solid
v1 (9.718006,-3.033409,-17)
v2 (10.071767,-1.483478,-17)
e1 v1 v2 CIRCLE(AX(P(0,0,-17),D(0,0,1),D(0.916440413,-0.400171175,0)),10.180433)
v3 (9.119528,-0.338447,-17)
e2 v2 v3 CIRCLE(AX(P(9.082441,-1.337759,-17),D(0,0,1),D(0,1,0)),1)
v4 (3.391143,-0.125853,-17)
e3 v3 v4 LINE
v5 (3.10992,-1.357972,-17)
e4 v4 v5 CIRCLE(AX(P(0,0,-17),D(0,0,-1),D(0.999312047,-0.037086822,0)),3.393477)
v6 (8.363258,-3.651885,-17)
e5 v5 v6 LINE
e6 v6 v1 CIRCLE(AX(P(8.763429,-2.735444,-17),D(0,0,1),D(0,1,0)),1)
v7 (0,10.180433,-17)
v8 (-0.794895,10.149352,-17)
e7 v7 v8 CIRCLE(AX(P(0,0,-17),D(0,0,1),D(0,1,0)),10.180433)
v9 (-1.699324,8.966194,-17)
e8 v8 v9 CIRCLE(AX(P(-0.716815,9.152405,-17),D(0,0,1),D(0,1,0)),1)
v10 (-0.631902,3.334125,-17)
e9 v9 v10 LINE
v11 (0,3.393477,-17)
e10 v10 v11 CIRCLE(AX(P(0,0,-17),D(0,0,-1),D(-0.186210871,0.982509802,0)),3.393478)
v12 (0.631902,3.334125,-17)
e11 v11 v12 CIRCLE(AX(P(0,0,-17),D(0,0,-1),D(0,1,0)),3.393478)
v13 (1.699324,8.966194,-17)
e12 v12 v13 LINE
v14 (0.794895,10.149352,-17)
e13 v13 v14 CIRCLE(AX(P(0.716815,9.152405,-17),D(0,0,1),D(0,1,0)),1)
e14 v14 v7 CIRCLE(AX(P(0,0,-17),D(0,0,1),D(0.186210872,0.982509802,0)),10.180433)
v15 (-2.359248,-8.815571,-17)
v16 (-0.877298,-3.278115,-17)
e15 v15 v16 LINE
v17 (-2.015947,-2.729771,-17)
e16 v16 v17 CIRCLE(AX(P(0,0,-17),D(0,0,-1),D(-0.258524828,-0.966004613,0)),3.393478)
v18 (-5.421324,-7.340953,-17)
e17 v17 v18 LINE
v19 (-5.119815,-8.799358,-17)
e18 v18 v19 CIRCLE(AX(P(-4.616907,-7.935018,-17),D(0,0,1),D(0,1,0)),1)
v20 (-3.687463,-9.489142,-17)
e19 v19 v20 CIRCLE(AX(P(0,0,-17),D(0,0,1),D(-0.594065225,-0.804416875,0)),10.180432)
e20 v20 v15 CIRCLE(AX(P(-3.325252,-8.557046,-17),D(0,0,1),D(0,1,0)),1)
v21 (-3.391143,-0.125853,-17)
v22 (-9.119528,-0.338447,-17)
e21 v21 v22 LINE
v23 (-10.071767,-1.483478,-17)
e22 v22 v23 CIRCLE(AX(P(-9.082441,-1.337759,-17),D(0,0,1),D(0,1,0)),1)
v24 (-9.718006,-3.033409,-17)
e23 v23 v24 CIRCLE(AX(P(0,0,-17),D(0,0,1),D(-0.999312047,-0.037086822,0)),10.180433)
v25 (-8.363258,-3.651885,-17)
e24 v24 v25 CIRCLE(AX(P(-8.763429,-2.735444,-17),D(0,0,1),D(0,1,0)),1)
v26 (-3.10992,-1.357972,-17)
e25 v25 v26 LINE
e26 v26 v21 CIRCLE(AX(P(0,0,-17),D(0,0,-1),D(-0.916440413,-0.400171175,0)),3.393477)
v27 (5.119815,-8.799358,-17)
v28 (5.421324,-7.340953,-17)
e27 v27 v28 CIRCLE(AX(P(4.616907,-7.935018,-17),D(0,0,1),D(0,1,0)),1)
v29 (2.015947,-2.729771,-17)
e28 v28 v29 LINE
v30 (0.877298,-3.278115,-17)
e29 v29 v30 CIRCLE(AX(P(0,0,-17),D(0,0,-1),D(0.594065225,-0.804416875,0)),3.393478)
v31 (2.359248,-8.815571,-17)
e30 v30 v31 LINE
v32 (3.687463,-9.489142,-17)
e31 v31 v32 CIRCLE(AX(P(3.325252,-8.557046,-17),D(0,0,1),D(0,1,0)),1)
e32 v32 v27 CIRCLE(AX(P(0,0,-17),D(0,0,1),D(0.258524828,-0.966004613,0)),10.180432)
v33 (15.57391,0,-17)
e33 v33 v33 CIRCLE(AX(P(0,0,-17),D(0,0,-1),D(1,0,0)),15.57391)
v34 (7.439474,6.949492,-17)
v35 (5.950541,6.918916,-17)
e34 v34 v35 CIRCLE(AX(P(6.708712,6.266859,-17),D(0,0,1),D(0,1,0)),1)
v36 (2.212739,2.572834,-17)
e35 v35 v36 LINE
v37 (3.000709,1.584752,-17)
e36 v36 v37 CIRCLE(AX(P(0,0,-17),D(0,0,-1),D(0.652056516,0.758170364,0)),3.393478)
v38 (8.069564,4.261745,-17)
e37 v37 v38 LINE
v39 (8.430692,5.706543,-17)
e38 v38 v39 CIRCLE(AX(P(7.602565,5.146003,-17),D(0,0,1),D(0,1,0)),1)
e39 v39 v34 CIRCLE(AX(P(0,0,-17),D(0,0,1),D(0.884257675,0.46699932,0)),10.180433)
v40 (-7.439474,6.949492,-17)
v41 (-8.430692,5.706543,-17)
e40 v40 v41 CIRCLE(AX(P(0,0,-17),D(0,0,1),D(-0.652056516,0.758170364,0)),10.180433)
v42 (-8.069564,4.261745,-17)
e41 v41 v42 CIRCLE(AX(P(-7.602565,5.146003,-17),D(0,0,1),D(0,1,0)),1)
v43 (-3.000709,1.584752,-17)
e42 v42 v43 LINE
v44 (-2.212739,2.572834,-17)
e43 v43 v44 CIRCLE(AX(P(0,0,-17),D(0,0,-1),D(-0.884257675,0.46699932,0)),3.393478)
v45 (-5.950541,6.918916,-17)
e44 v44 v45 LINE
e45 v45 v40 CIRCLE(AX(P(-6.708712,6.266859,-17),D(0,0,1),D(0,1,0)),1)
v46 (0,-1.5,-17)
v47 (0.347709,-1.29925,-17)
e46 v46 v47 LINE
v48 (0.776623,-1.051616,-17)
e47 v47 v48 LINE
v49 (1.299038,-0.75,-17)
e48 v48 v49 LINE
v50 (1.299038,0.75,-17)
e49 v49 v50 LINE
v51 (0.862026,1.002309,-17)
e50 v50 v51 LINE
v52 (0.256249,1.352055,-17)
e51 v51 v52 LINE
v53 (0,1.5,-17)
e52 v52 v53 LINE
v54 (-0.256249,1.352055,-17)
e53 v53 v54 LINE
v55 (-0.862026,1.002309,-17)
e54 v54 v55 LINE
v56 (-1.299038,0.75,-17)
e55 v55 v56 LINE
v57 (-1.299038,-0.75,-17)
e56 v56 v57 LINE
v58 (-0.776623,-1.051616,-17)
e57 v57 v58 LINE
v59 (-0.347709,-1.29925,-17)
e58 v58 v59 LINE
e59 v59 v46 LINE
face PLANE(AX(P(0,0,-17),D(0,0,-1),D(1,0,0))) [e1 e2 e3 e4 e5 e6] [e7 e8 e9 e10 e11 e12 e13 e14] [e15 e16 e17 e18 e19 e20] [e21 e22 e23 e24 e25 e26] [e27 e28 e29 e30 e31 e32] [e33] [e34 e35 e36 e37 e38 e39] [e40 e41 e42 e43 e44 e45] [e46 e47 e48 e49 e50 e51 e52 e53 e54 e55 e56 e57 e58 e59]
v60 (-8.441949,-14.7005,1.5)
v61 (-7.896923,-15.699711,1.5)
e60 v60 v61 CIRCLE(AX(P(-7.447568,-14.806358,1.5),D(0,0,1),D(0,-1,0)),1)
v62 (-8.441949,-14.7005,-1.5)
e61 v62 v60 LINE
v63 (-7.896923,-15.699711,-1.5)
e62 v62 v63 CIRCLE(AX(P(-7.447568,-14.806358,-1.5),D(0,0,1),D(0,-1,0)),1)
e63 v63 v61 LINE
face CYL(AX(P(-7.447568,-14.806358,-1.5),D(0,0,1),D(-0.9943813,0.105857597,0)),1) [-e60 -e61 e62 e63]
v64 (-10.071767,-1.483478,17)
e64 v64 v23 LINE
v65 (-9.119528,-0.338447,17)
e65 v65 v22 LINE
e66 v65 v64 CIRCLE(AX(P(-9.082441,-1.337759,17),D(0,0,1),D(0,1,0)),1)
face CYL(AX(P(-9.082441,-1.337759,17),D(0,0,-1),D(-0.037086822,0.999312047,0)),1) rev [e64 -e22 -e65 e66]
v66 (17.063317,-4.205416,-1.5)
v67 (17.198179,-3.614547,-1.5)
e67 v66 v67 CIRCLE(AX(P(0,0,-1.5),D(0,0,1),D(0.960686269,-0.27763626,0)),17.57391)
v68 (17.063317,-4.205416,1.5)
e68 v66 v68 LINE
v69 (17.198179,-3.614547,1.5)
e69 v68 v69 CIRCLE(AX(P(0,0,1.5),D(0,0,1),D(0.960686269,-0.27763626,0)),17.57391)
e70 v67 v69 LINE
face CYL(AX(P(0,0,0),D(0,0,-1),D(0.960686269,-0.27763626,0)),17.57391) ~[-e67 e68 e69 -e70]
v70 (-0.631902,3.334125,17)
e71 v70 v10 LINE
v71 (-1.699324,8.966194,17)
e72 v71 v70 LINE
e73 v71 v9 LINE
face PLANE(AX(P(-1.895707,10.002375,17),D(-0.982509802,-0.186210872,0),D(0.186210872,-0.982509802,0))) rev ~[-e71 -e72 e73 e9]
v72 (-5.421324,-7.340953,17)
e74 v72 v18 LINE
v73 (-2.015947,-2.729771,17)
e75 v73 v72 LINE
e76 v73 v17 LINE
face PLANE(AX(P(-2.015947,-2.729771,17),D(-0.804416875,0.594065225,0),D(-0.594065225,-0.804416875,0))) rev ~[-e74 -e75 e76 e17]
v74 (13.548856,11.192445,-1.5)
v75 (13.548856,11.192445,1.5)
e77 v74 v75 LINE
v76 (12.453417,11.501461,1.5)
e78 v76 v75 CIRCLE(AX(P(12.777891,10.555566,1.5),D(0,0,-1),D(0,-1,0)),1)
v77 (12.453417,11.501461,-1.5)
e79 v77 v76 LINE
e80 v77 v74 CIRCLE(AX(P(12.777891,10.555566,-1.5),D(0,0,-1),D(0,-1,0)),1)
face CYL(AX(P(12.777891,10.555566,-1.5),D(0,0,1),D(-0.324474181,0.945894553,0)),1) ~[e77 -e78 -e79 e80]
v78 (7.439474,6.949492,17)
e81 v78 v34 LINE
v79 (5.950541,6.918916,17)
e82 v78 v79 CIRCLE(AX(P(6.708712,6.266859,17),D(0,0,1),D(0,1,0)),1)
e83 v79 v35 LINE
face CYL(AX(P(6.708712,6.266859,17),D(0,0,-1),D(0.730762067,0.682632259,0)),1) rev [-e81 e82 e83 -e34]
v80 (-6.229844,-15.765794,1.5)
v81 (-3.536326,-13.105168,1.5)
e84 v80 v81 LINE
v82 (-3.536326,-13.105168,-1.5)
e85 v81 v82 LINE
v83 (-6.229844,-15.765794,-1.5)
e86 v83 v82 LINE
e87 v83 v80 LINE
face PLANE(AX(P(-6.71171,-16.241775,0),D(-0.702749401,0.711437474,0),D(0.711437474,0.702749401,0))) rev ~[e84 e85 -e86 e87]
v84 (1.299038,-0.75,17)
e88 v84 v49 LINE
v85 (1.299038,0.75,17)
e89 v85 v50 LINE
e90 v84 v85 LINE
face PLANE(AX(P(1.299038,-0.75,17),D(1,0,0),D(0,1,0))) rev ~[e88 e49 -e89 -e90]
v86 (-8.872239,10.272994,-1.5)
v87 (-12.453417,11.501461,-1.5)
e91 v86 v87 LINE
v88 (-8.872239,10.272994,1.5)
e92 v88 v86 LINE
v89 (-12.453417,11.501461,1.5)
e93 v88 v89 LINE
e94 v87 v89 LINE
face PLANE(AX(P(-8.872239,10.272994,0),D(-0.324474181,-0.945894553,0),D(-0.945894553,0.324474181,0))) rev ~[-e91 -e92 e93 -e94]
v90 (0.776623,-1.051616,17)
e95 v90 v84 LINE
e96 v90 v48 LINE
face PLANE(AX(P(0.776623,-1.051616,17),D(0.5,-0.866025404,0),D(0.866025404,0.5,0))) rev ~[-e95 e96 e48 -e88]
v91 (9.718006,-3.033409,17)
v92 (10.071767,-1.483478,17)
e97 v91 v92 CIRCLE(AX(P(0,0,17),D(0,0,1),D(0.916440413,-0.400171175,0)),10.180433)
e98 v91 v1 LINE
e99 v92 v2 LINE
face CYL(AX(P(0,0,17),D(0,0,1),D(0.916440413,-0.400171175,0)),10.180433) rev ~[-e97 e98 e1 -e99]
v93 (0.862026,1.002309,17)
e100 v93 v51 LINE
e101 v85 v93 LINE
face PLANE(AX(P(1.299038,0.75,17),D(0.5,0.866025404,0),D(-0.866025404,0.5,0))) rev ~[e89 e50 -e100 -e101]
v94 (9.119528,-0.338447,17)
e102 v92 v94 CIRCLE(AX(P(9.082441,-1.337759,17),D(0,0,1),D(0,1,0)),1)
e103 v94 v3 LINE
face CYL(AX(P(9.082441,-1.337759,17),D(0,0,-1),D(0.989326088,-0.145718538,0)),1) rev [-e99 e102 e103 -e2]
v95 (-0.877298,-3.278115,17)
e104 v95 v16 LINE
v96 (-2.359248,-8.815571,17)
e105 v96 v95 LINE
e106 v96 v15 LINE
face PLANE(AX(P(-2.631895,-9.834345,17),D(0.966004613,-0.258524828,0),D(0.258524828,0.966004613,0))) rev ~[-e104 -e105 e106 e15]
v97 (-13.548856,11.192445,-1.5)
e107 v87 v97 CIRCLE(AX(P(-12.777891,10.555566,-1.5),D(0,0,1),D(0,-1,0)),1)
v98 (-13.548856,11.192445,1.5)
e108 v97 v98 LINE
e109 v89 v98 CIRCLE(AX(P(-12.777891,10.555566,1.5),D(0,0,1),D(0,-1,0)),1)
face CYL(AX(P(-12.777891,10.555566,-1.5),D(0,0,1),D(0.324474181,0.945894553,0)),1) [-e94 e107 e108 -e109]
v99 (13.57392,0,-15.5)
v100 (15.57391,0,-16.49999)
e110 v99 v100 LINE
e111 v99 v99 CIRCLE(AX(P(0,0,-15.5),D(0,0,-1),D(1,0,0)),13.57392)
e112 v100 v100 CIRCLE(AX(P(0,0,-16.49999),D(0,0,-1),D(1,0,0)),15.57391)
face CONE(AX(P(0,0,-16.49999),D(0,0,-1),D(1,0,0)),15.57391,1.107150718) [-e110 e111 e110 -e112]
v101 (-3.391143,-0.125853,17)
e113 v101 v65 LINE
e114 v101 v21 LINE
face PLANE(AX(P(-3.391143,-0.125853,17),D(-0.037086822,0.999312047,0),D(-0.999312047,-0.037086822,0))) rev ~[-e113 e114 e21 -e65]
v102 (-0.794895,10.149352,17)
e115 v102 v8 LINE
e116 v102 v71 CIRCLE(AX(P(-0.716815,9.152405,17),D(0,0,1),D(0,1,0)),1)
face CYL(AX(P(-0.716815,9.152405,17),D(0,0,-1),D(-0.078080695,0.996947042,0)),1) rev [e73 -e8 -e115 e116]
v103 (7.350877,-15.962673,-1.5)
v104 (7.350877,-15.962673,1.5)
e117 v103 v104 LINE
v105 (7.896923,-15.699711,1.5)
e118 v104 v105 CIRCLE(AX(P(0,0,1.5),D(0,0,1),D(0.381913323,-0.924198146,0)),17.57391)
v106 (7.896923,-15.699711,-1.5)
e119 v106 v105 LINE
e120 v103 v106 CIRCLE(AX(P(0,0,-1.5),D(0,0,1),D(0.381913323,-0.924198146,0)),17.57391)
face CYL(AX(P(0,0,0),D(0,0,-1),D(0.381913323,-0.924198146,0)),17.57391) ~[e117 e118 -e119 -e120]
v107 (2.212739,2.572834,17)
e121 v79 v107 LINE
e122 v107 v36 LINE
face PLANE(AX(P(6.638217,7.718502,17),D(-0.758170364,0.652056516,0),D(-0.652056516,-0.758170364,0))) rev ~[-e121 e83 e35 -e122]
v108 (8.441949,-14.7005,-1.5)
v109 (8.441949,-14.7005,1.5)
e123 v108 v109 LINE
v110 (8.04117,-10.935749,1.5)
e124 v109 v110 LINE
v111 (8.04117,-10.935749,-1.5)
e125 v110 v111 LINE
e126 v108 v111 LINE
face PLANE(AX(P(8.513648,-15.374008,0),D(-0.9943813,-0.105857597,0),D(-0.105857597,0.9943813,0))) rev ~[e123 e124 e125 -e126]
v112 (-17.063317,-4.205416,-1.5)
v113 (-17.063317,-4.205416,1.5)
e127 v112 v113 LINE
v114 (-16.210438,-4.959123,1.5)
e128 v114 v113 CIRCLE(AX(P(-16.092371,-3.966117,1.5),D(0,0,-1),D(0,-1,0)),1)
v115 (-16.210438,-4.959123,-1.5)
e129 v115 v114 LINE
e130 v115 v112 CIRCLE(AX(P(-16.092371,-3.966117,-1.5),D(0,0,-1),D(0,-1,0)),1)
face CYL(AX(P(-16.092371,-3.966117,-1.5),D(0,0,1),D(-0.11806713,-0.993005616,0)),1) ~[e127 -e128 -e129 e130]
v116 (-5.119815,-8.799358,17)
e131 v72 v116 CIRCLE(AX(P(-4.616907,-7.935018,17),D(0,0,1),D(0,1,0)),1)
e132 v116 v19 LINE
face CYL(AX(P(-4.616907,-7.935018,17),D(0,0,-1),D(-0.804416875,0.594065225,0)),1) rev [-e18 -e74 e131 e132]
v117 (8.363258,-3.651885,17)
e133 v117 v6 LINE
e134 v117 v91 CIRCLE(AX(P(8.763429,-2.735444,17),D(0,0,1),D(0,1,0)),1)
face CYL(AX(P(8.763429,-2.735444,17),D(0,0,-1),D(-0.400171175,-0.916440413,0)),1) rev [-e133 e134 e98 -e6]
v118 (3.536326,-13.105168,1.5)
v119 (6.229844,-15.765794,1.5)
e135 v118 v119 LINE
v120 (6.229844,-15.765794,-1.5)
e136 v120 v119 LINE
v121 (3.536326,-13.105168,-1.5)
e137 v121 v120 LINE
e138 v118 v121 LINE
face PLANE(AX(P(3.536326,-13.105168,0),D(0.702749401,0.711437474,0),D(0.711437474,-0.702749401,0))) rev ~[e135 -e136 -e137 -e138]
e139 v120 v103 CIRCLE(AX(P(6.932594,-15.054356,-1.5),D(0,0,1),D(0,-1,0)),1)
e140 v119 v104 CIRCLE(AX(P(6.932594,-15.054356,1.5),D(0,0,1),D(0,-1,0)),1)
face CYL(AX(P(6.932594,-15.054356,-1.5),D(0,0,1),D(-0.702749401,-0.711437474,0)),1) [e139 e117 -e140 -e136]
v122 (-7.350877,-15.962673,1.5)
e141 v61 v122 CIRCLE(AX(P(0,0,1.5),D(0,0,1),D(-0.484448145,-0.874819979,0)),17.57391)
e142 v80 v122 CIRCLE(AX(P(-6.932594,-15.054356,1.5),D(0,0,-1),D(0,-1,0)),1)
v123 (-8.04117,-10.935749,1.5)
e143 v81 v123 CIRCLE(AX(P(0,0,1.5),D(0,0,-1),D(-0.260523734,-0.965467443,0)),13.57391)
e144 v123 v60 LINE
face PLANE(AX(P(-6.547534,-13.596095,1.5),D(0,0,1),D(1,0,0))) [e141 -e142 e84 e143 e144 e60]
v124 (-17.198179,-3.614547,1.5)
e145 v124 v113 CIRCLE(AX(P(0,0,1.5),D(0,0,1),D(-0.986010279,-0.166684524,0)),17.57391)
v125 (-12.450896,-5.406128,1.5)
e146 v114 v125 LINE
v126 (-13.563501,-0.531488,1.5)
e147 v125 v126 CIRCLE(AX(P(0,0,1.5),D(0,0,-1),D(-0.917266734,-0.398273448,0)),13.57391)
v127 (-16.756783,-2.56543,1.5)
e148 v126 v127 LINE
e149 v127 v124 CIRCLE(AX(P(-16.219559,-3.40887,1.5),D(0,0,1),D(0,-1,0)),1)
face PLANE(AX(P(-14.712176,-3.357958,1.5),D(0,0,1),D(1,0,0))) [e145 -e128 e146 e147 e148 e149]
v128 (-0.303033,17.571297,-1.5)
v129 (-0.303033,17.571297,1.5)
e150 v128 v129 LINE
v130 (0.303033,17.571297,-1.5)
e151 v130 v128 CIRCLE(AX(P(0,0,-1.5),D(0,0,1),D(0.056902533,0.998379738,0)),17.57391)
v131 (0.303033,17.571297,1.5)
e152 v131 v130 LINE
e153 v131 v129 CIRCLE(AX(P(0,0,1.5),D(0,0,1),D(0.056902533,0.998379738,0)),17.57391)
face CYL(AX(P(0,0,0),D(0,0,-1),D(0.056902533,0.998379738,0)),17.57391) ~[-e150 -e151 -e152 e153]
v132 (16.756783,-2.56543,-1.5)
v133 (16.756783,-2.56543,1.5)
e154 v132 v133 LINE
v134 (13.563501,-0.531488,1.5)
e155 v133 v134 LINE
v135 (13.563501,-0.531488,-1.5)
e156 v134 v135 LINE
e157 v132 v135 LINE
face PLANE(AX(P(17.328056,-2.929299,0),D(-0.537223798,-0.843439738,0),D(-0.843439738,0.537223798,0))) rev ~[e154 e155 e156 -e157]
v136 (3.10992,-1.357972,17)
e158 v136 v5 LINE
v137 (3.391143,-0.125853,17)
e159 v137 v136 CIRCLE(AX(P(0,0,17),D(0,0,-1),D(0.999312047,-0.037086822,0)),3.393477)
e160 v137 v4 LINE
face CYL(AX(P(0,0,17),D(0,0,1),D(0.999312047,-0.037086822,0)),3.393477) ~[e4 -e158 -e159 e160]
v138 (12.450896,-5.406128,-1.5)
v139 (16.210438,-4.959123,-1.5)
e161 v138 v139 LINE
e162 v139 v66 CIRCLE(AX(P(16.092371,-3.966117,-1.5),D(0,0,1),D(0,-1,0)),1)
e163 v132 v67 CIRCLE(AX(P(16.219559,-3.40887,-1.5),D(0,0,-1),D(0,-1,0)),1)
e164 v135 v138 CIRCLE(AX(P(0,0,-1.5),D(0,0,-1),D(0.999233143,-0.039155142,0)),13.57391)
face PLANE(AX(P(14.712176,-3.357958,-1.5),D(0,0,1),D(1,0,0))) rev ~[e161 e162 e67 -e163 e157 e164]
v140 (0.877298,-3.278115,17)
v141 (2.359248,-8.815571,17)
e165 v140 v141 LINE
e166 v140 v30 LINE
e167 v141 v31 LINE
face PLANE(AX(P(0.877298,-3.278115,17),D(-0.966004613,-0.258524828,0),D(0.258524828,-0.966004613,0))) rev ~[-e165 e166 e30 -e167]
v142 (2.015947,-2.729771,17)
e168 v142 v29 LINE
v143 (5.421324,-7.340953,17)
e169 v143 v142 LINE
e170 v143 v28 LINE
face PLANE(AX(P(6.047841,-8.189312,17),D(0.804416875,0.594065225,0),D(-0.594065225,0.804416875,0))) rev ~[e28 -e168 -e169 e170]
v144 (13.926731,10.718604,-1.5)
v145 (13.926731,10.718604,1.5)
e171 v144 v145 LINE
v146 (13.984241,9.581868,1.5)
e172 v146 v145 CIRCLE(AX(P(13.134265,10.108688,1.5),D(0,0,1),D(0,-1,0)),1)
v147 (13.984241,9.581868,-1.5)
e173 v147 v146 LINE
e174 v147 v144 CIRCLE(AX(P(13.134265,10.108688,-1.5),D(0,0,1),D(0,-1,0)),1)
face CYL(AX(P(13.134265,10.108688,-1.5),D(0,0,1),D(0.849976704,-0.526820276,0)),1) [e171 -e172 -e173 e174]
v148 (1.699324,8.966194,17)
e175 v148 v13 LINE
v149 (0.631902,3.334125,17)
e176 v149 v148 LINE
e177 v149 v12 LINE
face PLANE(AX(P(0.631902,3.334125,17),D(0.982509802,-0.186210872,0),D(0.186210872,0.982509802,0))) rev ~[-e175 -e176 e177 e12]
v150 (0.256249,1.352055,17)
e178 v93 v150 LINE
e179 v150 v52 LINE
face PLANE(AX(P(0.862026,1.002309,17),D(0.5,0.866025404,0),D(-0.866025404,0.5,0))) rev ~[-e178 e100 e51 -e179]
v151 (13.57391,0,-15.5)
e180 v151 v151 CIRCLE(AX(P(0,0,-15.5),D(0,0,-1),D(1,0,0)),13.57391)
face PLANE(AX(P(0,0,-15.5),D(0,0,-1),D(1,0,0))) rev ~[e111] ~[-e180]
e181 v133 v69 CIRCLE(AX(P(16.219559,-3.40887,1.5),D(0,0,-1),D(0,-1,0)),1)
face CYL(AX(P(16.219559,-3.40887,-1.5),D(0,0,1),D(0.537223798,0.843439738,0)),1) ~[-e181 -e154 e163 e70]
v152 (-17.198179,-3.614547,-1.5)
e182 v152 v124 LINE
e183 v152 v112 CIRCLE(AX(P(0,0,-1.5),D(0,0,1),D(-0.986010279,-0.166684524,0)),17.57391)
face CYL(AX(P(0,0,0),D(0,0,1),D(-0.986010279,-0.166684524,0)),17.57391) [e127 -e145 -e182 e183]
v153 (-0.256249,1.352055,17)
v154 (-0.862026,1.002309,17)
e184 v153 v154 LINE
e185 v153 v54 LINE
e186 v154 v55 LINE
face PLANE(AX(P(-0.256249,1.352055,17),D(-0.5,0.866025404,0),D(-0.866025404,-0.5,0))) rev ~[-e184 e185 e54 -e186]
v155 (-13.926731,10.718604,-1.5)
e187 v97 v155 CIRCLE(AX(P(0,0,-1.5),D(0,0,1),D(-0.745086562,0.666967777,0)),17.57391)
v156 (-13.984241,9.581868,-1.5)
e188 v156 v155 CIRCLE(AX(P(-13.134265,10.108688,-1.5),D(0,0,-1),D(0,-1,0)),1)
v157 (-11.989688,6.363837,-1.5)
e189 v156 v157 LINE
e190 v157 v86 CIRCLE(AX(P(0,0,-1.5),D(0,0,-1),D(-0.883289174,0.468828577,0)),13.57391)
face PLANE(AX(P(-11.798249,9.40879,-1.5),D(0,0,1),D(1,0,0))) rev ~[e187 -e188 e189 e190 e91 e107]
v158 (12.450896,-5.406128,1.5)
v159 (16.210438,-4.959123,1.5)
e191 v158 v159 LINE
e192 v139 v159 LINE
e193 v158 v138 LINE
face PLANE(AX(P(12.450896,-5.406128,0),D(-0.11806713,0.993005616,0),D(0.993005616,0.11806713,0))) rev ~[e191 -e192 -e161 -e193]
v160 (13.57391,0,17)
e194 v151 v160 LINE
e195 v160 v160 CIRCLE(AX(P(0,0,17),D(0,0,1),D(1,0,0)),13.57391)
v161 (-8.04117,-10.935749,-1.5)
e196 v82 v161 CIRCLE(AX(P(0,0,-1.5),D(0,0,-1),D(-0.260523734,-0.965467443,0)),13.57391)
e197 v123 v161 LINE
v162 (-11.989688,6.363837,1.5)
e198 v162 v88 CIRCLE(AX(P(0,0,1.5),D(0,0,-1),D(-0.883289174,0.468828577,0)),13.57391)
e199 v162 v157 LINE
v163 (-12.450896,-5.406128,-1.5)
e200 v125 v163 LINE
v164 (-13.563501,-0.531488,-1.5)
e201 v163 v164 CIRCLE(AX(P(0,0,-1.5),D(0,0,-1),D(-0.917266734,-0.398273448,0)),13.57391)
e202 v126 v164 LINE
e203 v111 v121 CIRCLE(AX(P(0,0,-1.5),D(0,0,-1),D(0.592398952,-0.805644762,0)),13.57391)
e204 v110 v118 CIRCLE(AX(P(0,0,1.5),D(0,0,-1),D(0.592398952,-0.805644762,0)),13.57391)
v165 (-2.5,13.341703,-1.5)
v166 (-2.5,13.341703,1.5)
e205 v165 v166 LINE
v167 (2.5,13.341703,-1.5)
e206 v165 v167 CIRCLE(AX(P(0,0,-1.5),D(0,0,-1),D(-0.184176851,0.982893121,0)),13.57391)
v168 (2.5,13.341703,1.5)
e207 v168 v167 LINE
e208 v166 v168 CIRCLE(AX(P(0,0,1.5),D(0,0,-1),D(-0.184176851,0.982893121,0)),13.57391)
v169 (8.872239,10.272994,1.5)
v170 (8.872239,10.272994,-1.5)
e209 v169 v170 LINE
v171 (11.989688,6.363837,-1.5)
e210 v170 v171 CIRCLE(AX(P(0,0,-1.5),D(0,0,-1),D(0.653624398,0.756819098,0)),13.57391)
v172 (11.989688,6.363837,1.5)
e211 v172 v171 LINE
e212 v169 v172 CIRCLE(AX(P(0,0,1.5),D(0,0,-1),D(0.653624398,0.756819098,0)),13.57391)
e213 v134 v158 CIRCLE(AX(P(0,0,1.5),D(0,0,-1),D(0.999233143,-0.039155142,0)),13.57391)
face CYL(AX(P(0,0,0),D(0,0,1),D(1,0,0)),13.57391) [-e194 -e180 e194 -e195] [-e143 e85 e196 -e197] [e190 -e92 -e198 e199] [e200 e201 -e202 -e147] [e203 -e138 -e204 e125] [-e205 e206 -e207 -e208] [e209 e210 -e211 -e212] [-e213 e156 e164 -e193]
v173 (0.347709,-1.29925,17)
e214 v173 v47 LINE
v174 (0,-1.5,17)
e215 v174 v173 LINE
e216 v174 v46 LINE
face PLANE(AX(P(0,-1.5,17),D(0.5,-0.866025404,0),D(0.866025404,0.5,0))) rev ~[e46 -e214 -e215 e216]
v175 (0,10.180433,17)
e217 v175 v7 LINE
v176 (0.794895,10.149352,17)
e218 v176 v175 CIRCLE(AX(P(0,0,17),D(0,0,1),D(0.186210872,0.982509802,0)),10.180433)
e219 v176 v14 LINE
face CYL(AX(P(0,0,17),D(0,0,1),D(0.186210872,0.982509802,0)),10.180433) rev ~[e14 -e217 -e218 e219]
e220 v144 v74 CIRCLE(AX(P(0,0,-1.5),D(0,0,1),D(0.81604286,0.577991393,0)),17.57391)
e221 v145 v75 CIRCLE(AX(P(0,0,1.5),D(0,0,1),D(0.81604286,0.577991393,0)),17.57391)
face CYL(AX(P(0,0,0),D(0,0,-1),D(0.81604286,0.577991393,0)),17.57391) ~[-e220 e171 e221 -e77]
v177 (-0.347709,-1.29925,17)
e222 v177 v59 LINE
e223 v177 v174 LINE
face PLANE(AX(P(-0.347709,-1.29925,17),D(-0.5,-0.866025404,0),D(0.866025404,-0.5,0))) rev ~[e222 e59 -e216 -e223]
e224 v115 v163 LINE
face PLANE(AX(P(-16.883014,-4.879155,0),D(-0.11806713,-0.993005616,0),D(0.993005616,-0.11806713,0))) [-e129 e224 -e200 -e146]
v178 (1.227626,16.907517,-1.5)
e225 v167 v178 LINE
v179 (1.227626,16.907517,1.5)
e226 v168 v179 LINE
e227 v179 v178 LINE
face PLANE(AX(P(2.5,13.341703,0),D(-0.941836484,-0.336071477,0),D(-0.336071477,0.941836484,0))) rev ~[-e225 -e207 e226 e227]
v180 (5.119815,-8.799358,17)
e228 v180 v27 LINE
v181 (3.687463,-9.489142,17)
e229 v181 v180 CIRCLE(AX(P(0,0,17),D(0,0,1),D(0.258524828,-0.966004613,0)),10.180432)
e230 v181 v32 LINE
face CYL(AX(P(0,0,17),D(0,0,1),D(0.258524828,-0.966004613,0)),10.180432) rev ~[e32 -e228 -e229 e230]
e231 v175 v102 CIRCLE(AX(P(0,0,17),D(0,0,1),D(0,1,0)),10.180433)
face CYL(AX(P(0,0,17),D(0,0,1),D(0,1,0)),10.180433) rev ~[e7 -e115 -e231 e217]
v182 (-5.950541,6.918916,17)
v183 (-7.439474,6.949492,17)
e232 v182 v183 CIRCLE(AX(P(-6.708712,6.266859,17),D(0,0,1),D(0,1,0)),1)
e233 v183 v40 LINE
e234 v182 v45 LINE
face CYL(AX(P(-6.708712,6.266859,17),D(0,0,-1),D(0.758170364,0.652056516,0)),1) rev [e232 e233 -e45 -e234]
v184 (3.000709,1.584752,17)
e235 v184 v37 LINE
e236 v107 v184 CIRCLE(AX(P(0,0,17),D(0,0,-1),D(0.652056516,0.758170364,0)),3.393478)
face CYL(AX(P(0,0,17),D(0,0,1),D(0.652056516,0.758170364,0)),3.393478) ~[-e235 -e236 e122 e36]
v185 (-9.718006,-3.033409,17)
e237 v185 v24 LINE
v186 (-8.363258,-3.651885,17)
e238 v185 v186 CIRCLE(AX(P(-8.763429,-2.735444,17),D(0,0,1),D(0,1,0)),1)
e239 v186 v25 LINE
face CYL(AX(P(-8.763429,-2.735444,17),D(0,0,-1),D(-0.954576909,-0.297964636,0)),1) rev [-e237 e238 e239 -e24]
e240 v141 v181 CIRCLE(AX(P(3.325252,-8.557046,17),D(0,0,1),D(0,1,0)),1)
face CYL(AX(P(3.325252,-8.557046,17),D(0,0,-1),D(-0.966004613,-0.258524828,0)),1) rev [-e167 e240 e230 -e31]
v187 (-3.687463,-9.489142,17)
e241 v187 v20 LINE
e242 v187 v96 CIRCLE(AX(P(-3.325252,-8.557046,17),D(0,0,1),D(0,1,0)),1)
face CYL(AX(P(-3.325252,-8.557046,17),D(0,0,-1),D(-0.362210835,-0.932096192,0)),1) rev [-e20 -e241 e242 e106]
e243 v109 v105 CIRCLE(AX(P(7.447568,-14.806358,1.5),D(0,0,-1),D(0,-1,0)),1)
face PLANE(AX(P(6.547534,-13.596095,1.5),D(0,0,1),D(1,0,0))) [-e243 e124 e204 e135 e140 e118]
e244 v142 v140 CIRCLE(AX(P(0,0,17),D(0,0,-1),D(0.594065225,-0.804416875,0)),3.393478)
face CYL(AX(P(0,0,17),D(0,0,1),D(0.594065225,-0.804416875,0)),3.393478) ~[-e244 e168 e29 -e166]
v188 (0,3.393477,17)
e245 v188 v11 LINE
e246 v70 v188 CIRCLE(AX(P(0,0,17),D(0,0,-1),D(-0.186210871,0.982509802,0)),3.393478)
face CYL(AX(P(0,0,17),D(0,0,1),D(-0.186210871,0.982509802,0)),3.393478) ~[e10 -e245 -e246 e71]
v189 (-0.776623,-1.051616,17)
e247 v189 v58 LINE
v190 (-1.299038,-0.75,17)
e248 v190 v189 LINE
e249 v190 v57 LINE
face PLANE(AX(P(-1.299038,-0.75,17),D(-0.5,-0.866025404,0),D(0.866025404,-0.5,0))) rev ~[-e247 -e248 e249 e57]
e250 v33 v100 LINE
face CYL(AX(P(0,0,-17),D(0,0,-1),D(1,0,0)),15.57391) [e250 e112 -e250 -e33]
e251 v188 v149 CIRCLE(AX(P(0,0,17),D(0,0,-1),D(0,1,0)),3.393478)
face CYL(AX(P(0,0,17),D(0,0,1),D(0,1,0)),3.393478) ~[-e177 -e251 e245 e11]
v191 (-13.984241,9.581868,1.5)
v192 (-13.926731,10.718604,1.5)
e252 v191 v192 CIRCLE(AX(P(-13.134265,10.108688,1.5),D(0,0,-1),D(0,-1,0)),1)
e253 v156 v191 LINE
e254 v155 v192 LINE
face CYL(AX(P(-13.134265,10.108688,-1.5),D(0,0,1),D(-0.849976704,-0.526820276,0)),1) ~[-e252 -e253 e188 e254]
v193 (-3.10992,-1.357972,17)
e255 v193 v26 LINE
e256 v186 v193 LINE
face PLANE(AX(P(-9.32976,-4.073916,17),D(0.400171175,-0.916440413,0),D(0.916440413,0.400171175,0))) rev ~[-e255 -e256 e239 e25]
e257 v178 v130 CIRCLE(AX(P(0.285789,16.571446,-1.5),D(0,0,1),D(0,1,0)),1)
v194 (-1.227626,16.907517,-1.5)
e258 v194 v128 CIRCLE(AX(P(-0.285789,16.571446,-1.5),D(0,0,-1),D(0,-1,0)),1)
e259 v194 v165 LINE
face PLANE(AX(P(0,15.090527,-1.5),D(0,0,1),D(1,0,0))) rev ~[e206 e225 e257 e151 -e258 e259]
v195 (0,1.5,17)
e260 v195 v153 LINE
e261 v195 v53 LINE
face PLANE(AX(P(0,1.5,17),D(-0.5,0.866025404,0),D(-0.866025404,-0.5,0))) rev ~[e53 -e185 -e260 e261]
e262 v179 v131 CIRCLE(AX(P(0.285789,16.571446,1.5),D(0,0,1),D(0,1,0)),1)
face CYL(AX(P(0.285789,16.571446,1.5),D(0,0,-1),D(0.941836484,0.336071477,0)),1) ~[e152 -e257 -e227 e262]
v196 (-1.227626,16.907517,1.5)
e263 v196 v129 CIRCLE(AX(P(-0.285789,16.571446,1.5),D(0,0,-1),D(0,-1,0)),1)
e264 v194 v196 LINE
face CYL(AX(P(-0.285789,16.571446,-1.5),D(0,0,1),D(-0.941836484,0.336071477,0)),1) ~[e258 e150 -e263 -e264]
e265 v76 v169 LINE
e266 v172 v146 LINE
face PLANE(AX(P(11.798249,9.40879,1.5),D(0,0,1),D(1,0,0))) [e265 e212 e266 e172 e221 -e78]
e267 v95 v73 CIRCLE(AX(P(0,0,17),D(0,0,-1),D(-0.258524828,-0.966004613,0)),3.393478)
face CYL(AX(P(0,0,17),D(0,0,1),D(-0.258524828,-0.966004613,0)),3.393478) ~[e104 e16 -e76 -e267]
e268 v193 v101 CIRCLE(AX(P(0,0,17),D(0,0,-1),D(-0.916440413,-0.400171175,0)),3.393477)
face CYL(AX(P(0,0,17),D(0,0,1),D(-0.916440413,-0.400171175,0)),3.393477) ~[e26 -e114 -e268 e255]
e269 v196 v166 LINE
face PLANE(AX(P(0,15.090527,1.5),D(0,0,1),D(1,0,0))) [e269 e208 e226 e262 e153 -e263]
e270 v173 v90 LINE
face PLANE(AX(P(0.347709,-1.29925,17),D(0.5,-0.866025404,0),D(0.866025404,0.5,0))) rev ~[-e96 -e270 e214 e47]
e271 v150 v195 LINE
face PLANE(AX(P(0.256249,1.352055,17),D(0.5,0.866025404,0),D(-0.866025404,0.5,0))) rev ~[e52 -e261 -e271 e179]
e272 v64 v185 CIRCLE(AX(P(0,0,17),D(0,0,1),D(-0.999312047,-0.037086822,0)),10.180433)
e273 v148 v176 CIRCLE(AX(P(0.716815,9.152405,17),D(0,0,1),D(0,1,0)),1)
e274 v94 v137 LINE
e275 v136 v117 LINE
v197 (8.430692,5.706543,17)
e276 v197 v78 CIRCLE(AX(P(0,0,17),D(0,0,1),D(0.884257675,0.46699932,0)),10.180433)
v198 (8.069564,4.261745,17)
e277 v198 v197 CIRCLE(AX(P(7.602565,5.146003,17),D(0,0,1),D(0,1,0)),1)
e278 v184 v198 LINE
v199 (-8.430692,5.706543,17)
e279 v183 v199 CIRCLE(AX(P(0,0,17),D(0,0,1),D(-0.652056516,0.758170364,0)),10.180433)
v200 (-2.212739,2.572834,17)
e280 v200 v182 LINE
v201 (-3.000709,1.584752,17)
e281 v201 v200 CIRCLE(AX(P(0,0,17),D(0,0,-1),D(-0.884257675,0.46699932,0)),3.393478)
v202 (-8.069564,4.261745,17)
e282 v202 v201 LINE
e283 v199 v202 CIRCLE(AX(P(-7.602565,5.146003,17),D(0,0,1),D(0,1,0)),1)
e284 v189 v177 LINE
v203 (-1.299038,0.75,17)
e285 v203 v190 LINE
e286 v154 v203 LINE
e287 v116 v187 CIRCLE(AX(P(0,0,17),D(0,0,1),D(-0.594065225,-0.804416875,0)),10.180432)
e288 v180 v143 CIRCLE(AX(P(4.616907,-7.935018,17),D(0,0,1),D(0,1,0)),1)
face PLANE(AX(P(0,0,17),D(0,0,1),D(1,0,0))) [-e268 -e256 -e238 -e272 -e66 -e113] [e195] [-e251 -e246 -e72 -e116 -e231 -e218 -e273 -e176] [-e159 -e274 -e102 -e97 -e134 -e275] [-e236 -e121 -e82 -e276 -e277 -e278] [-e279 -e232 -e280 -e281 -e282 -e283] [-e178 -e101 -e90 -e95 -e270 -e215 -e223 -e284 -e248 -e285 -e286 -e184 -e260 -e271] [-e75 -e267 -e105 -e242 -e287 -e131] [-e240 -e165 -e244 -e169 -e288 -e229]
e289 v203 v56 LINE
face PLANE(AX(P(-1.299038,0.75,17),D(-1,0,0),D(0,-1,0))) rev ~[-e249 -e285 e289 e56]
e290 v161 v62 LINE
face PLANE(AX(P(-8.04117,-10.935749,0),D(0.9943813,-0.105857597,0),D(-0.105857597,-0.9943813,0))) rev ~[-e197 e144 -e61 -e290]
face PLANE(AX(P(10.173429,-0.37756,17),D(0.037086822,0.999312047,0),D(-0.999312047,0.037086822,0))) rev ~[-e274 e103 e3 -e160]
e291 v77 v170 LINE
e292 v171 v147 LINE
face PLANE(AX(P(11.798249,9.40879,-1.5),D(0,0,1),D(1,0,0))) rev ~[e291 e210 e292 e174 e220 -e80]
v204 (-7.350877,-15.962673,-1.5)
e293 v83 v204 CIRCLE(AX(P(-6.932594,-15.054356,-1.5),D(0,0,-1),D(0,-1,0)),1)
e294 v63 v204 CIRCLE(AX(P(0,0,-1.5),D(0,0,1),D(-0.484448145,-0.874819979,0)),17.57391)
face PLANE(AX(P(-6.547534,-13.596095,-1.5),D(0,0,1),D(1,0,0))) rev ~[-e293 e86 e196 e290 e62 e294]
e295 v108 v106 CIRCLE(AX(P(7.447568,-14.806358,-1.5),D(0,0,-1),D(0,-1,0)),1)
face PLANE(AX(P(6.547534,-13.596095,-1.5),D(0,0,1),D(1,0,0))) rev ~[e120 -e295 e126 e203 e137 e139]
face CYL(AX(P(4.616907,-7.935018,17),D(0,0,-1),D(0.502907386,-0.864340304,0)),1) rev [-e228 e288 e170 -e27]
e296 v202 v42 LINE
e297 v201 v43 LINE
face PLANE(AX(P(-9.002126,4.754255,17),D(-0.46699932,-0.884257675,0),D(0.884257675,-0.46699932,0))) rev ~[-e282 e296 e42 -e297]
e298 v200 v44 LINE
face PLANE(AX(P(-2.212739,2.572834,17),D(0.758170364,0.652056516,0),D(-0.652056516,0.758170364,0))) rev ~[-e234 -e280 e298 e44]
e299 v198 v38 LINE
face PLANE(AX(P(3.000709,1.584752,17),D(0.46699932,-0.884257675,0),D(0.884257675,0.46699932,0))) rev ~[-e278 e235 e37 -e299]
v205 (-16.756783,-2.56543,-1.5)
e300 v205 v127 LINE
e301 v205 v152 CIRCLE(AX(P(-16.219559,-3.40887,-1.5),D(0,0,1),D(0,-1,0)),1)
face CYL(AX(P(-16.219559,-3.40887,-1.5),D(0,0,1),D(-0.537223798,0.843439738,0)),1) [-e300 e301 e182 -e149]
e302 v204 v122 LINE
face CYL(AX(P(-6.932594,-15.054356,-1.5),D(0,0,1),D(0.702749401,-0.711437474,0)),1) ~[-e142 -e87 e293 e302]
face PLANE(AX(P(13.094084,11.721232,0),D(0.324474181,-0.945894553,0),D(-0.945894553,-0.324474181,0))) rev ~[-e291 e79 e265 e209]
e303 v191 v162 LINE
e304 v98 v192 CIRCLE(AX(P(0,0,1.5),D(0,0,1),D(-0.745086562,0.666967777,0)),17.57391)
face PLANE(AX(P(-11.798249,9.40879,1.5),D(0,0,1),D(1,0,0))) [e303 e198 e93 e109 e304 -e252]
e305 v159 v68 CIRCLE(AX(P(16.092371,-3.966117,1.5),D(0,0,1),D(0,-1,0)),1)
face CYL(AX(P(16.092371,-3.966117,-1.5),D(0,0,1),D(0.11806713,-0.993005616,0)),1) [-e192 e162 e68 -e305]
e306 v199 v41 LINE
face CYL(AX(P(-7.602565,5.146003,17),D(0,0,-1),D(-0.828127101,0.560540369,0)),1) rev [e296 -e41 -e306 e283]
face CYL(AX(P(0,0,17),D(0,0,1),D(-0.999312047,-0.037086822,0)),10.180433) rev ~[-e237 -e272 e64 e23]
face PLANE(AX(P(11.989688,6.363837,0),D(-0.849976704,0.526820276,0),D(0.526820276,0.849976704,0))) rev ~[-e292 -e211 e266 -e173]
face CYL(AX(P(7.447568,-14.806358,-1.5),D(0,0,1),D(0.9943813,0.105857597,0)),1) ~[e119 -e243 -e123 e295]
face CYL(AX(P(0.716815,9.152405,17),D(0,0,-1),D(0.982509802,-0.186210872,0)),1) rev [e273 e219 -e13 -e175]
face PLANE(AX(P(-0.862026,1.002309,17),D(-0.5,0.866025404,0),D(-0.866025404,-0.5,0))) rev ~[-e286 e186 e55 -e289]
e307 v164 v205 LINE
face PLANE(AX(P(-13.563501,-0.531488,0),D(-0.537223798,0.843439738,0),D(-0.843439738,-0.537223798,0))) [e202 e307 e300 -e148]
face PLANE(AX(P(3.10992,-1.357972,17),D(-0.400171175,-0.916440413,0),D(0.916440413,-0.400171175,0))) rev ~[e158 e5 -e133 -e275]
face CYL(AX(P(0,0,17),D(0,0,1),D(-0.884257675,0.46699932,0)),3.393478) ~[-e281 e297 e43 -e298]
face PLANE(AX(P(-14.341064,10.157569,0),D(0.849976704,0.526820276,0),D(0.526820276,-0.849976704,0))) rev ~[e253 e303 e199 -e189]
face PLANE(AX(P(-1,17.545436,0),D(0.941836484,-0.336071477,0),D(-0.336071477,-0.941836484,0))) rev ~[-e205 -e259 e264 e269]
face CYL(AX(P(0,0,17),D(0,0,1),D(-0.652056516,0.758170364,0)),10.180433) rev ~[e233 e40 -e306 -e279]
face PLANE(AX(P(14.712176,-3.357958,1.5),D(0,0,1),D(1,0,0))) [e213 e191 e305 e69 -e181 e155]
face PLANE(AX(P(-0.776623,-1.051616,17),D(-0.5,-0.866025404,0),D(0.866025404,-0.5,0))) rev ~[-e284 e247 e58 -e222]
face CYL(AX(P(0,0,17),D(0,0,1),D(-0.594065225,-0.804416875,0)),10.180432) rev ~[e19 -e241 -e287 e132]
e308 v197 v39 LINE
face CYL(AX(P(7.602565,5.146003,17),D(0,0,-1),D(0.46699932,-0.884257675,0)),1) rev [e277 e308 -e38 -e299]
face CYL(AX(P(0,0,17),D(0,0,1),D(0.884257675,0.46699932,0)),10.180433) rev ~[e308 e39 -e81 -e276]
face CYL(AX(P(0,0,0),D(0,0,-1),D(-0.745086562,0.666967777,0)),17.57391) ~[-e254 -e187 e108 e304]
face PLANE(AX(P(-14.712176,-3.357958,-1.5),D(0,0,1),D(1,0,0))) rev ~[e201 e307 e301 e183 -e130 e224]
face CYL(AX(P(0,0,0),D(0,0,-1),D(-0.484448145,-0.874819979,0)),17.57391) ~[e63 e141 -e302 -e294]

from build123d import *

# Parameters (mm, degrees)
F0_R     = 13.57391
F1_DEPTH = 17
F3_DEPTH = 1.5
F5_DEPTH = 34
F6_R     = 1
F7_R     = 15.57391
F7_R_2   = 13.57391
F8_DEPTH = 1.5
F9_SIZE2 = 0.99999
F9_SIZE  = 1.99999
F10_R    = 1


# Not quite as in the source:
# - a fillet or chamfer is up to 0.001 mm smaller than in the source, because OpenCascade refuses the exact size


with BuildPart() as f1:
    # F0 (on Top) → F1 (new body, symmetric)
    with BuildSketch(Plane.XY):
        Circle(F0_R)
    extrude(amount=F1_DEPTH, both=True)

    # F2 (on Top) → F3 (join, symmetric)
    with BuildSketch(Plane.XY):
        with BuildLine():
            Line((-8.8722387473, 10.27299432), (-13.094084175, 11.721231689))
            ThreePointArc((-13.094084175, 11.721231689), (-13.7398361081, 10.9571536638), (-14.3410637787, 10.1575687241))
            Line((-14.3410637787, 10.1575687241), (-11.9896877566, 6.3638369077))
            ThreePointArc((-11.9896877566, 6.3638369077), (-10.6125101782, 8.4631944563), (-8.8722387473, 10.27299432))
        make_face()
        with BuildLine():
            ThreePointArc((1, 17.5454356654), (0, 17.57391), (-1, 17.5454356654))
            Line((-1, 17.5454356654), (-2.5, 13.3417027657))
            ThreePointArc((-2.5, 13.3417027657), (0, 13.57391), (2.5, 13.3417027657))
            Line((2.5, 13.3417027657), (1, 17.5454356654))
        make_face()
        with BuildLine():
            Line((11.9896877566, 6.3638369077), (14.3410637787, 10.1575687241))
            ThreePointArc((14.3410637787, 10.1575687241), (13.7398361081, 10.9571536638), (13.094084175, 11.721231689))
            Line((13.094084175, 11.721231689), (8.8722387473, 10.27299432))
            ThreePointArc((8.8722387473, 10.27299432), (10.6125101782, 8.4631944563), (11.9896877566, 6.3638369077))
        make_face()
        with BuildLine():
            Line((12.4508960874, -5.4061279404), (16.8830140276, -4.8791546431))
            ThreePointArc((16.8830140276, -4.8791546431), (17.1332953852, -3.9105628665), (17.3280558955, -2.9292988187))
            Line((17.3280558955, -2.9292988187), (13.5635007572, -0.5314883795))
            ThreePointArc((13.5635007572, -0.5314883795), (13.2335837364, -3.0204791306), (12.4508960874, -5.4061279404))
        make_face()
        with BuildLine():
            Line((3.5363257124, -13.1051681845), (6.711710363, -16.2417750474))
            ThreePointArc((6.711710363, -16.2417750474), (7.6250337817, -15.8335457973), (8.5136480988, -15.3740075692))
            Line((8.5136480988, -15.3740075692), (8.0411700519, -10.9357494889))
            ThreePointArc((8.0411700519, -10.9357494889), (5.8894988252, -12.2296703257), (3.5363257124, -13.1051681845))
        make_face()
        with BuildLine():
            Line((-8.0411700519, -10.9357494889), (-8.5136480988, -15.3740075692))
            ThreePointArc((-8.5136480988, -15.3740075692), (-7.6250337817, -15.8335457973), (-6.711710363, -16.2417750474))
            Line((-6.711710363, -16.2417750474), (-3.5363257124, -13.1051681845))
            ThreePointArc((-3.5363257124, -13.1051681845), (-5.8894988252, -12.2296703257), (-8.0411700519, -10.9357494889))
        make_face()
        with BuildLine():
            Line((-13.5635007572, -0.5314883795), (-17.3280558955, -2.9292988187))
            ThreePointArc((-17.3280558955, -2.9292988187), (-17.1332953852, -3.9105628665), (-16.8830140276, -4.8791546431))
            Line((-16.8830140276, -4.8791546431), (-12.4508960874, -5.4061279404))
            ThreePointArc((-12.4508960874, -5.4061279404), (-13.2335837364, -3.0204791306), (-13.5635007572, -0.5314883795))
        make_face()
    extrude(amount=F3_DEPTH, both=True)

    # F4 (on face) → F5 (cut)
    with BuildSketch(Plane.XY.offset(17)):
        with BuildLine():
            ThreePointArc((-3.0007085232, 1.5847516846), (-2.6531275445, 2.1157986141), (-2.2127391143, 2.5728340707))
            Line((-2.2127391143, 2.5728340707), (-6.6382173429, 7.718502212))
            ThreePointArc((-6.6382173429, 7.718502212), (-7.9593826336, 6.3473958423), (-9.0021255696, 4.7542550537))
            Line((-9.0021255696, 4.7542550537), (-3.0007085232, 1.5847516846))
        make_face()
        with BuildLine():
            ThreePointArc((-0.6319024037, 3.334124907), (-0.3173418417, 3.3786067688), (0, 3.3934775))
            Line((0, 3.3934775), (0, 6.786955))
            Line((0, 6.786955), (0, 10.1804325))
            ThreePointArc((0, 10.1804325), (-0.9520255252, 10.1358203065), (-1.895707211, 10.0023747209))
            Line((-1.895707211, 10.0023747209), (-0.6319024037, 3.334124907))
        make_face()
        with BuildLine():
            Line((0, 6.786955), (0, 3.3934775))
            ThreePointArc((0, 3.3934775), (0.3173418417, 3.3786067688), (0.6319024037, 3.334124907))
            Line((0.6319024037, 3.334124907), (1.895707211, 10.0023747209))
            ThreePointArc((1.895707211, 10.0023747209), (0.9520255252, 10.1358203065), (0, 10.1804325))
            Line((0, 10.1804325), (0, 6.786955))
        make_face()
        with BuildLine():
            ThreePointArc((2.2127391143, 2.5728340707), (2.6531275445, 2.1157986141), (3.0007085232, 1.5847516846))
            Line((3.0007085232, 1.5847516846), (9.0021255696, 4.7542550537))
            ThreePointArc((9.0021255696, 4.7542550537), (7.9593826336, 6.3473958423), (6.6382173429, 7.718502212))
            Line((6.6382173429, 7.718502212), (2.2127391143, 2.5728340707))
        make_face()
        with BuildLine():
            ThreePointArc((3.3911429475, -0.1258532971), (3.3083959341, -0.7551197827), (3.1099199215, -1.3579718793))
            Line((3.1099199215, -1.3579718793), (9.3297597644, -4.073915638))
            ThreePointArc((9.3297597644, -4.073915638), (9.9251878023, -2.265359348), (10.1734288426, -0.3775598913))
            Line((10.1734288426, -0.3775598913), (3.3911429475, -0.1258532971))
        make_face()
        with BuildLine():
            ThreePointArc((2.0159469746, -2.7297705652), (1.4723747063, -3.0574175814), (0.8772981881, -3.2781149205))
            Line((0.8772981881, -3.2781149205), (2.6318945642, -9.8343447616))
            ThreePointArc((2.6318945642, -9.8343447616), (4.4171241189, -9.1722527443), (6.0478409237, -8.1893116956))
            Line((6.0478409237, -8.1893116956), (2.0159469746, -2.7297705652))
        make_face()
        with BuildLine():
            ThreePointArc((-0.8772981881, -3.2781149205), (-1.4723747063, -3.0574175814), (-2.0159469746, -2.7297705652))
            Line((-2.0159469746, -2.7297705652), (-6.0478409237, -8.1893116956))
            ThreePointArc((-6.0478409237, -8.1893116956), (-4.4171241189, -9.1722527443), (-2.6318945642, -9.8343447616))
            Line((-2.6318945642, -9.8343447616), (-0.8772981881, -3.2781149205))
        make_face()
        with BuildLine():
            ThreePointArc((-3.1099199215, -1.3579718793), (-3.3083959341, -0.7551197827), (-3.3911429475, -0.1258532971))
            Line((-3.3911429475, -0.1258532971), (-10.1734288426, -0.3775598913))
            ThreePointArc((-10.1734288426, -0.3775598913), (-9.9251878023, -2.265359348), (-9.3297597644, -4.073915638))
            Line((-9.3297597644, -4.073915638), (-3.1099199215, -1.3579718793))
        make_face()
        Polygon((-1.2990381057, 0.68605558), (0, 0), (-0.8620256343, 1.002309268), (-1.2990381057, 0.75), align=None)
        Polygon((-0.8620256343, 1.002309268), (0, 0), (-0.2562490973, 1.3520545147), align=None)
        Polygon((-0.2562490973, 1.3520545147), (0, 0), (0, 1.5), align=None)
        Polygon((0, 1.5), (0, 0), (0.2562490973, 1.3520545147), align=None)
        Polygon((0.2562490973, 1.3520545147), (0, 0), (0.8620256343, 1.002309268), align=None)
        Polygon((0.8620256343, 1.002309268), (0, 0), (1.2990381057, 0.68605558), (1.2990381057, 0.75), align=None)
        Polygon((1.2990381057, 0.68605558), (0, 0), (1.2990381057, -0.0482103619), align=None)
        Polygon((1.2990381057, -0.0482103619), (0, 0), (1.2990381057, -0.5672355759), align=None)
        Polygon((1.2990381057, -0.5672355759), (0, 0), (0.7766231283, -1.0516164278), (1.2990381057, -0.75), align=None)
        Polygon((0.7766231283, -1.0516164278), (0, 0), (0.3477089236, -1.2992501593), align=None)
        Polygon((0.3477089236, -1.2992501593), (0, 0), (-0.3477089236, -1.2992501593), (0, -1.5), align=None)
        Polygon((-0.3477089236, -1.2992501593), (0, 0), (-0.7766231283, -1.0516164278), align=None)
        Polygon((-0.7766231283, -1.0516164278), (0, 0), (-1.2990381057, -0.5672355759), (-1.2990381057, -0.75), align=None)
        Polygon((-1.2990381057, -0.5672355759), (0, 0), (-1.2990381057, -0.0482103619), align=None)
        Polygon((-1.2990381057, -0.0482103619), (0, 0), (-1.2990381057, 0.68605558), align=None)
    extrude(amount=-F5_DEPTH, mode=Mode.SUBTRACT)

    # F6
    f6_edges = [f1.edges().sort_by_distance(p)[0] for p in [
        (-6.047841, -8.189312, 0),
        (-2.631895, -9.834345, 0),
        (2.631895, -9.834345, 0),
        (6.047841, -8.189312, 0),
        (9.32976, -4.073916, 0),
        (-9.32976, -4.073916, 0),
        (-10.173429, -0.37756, 0),
        (-9.002126, 4.754255, 0),
        (-6.638217, 7.718502, 0),
        (6.638217, 7.718502, 0),
        (-1.895707, 10.002375, 0),
        (1.895707, 10.002375, 0),
        (9.002126, 4.754255, 0),
        (10.173429, -0.37756, 0),
    ]]
    fillet(f6_edges, radius=F6_R)

    # F7 (on face) → F8 (join)
    with BuildSketch(Plane(origin=(0, 0, -17), x_dir=(1, 0, 0), z_dir=(0, 0, -1))):
        Circle(F7_R)
        Circle(F7_R_2, mode=Mode.SUBTRACT)
    extrude(amount=-F8_DEPTH)

    # F9 (size 2 and 1 in the source; OpenCascade refuses exactly that, so slightly less here)
    f9_edges = [f1.edges().sort_by_distance(p)[0] for p in [
        (-15.57391, 0, -15.5),
    ]]
    f9_side = f1.faces().sort_by_distance((-15.133413, 0, -15.5))[0]
    chamfer(f9_edges, length=F9_SIZE, length2=F9_SIZE2, reference=f9_side)

    # F10
    f10_edges = [f1.edges().sort_by_distance(p)[0] for p in [
        (14.341064, 10.157569, 0),
        (13.094084, 11.721232, 0),
        (1, 17.545436, 0),
        (-1, 17.545436, 0),
        (-13.094084, 11.721232, 0),
        (-14.341064, 10.157569, 0),
        (-17.328056, -2.929299, 0),
        (-16.883014, -4.879155, 0),
        (-8.513648, -15.374008, 0),
        (-6.71171, -16.241775, 0),
        (6.71171, -16.241775, 0),
        (8.513648, -15.374008, 0),
        (16.883014, -4.879155, 0),
        (17.328056, -2.929299, 0),
    ]]
    fillet(f10_edges, radius=F10_R)


solid = f1.part
